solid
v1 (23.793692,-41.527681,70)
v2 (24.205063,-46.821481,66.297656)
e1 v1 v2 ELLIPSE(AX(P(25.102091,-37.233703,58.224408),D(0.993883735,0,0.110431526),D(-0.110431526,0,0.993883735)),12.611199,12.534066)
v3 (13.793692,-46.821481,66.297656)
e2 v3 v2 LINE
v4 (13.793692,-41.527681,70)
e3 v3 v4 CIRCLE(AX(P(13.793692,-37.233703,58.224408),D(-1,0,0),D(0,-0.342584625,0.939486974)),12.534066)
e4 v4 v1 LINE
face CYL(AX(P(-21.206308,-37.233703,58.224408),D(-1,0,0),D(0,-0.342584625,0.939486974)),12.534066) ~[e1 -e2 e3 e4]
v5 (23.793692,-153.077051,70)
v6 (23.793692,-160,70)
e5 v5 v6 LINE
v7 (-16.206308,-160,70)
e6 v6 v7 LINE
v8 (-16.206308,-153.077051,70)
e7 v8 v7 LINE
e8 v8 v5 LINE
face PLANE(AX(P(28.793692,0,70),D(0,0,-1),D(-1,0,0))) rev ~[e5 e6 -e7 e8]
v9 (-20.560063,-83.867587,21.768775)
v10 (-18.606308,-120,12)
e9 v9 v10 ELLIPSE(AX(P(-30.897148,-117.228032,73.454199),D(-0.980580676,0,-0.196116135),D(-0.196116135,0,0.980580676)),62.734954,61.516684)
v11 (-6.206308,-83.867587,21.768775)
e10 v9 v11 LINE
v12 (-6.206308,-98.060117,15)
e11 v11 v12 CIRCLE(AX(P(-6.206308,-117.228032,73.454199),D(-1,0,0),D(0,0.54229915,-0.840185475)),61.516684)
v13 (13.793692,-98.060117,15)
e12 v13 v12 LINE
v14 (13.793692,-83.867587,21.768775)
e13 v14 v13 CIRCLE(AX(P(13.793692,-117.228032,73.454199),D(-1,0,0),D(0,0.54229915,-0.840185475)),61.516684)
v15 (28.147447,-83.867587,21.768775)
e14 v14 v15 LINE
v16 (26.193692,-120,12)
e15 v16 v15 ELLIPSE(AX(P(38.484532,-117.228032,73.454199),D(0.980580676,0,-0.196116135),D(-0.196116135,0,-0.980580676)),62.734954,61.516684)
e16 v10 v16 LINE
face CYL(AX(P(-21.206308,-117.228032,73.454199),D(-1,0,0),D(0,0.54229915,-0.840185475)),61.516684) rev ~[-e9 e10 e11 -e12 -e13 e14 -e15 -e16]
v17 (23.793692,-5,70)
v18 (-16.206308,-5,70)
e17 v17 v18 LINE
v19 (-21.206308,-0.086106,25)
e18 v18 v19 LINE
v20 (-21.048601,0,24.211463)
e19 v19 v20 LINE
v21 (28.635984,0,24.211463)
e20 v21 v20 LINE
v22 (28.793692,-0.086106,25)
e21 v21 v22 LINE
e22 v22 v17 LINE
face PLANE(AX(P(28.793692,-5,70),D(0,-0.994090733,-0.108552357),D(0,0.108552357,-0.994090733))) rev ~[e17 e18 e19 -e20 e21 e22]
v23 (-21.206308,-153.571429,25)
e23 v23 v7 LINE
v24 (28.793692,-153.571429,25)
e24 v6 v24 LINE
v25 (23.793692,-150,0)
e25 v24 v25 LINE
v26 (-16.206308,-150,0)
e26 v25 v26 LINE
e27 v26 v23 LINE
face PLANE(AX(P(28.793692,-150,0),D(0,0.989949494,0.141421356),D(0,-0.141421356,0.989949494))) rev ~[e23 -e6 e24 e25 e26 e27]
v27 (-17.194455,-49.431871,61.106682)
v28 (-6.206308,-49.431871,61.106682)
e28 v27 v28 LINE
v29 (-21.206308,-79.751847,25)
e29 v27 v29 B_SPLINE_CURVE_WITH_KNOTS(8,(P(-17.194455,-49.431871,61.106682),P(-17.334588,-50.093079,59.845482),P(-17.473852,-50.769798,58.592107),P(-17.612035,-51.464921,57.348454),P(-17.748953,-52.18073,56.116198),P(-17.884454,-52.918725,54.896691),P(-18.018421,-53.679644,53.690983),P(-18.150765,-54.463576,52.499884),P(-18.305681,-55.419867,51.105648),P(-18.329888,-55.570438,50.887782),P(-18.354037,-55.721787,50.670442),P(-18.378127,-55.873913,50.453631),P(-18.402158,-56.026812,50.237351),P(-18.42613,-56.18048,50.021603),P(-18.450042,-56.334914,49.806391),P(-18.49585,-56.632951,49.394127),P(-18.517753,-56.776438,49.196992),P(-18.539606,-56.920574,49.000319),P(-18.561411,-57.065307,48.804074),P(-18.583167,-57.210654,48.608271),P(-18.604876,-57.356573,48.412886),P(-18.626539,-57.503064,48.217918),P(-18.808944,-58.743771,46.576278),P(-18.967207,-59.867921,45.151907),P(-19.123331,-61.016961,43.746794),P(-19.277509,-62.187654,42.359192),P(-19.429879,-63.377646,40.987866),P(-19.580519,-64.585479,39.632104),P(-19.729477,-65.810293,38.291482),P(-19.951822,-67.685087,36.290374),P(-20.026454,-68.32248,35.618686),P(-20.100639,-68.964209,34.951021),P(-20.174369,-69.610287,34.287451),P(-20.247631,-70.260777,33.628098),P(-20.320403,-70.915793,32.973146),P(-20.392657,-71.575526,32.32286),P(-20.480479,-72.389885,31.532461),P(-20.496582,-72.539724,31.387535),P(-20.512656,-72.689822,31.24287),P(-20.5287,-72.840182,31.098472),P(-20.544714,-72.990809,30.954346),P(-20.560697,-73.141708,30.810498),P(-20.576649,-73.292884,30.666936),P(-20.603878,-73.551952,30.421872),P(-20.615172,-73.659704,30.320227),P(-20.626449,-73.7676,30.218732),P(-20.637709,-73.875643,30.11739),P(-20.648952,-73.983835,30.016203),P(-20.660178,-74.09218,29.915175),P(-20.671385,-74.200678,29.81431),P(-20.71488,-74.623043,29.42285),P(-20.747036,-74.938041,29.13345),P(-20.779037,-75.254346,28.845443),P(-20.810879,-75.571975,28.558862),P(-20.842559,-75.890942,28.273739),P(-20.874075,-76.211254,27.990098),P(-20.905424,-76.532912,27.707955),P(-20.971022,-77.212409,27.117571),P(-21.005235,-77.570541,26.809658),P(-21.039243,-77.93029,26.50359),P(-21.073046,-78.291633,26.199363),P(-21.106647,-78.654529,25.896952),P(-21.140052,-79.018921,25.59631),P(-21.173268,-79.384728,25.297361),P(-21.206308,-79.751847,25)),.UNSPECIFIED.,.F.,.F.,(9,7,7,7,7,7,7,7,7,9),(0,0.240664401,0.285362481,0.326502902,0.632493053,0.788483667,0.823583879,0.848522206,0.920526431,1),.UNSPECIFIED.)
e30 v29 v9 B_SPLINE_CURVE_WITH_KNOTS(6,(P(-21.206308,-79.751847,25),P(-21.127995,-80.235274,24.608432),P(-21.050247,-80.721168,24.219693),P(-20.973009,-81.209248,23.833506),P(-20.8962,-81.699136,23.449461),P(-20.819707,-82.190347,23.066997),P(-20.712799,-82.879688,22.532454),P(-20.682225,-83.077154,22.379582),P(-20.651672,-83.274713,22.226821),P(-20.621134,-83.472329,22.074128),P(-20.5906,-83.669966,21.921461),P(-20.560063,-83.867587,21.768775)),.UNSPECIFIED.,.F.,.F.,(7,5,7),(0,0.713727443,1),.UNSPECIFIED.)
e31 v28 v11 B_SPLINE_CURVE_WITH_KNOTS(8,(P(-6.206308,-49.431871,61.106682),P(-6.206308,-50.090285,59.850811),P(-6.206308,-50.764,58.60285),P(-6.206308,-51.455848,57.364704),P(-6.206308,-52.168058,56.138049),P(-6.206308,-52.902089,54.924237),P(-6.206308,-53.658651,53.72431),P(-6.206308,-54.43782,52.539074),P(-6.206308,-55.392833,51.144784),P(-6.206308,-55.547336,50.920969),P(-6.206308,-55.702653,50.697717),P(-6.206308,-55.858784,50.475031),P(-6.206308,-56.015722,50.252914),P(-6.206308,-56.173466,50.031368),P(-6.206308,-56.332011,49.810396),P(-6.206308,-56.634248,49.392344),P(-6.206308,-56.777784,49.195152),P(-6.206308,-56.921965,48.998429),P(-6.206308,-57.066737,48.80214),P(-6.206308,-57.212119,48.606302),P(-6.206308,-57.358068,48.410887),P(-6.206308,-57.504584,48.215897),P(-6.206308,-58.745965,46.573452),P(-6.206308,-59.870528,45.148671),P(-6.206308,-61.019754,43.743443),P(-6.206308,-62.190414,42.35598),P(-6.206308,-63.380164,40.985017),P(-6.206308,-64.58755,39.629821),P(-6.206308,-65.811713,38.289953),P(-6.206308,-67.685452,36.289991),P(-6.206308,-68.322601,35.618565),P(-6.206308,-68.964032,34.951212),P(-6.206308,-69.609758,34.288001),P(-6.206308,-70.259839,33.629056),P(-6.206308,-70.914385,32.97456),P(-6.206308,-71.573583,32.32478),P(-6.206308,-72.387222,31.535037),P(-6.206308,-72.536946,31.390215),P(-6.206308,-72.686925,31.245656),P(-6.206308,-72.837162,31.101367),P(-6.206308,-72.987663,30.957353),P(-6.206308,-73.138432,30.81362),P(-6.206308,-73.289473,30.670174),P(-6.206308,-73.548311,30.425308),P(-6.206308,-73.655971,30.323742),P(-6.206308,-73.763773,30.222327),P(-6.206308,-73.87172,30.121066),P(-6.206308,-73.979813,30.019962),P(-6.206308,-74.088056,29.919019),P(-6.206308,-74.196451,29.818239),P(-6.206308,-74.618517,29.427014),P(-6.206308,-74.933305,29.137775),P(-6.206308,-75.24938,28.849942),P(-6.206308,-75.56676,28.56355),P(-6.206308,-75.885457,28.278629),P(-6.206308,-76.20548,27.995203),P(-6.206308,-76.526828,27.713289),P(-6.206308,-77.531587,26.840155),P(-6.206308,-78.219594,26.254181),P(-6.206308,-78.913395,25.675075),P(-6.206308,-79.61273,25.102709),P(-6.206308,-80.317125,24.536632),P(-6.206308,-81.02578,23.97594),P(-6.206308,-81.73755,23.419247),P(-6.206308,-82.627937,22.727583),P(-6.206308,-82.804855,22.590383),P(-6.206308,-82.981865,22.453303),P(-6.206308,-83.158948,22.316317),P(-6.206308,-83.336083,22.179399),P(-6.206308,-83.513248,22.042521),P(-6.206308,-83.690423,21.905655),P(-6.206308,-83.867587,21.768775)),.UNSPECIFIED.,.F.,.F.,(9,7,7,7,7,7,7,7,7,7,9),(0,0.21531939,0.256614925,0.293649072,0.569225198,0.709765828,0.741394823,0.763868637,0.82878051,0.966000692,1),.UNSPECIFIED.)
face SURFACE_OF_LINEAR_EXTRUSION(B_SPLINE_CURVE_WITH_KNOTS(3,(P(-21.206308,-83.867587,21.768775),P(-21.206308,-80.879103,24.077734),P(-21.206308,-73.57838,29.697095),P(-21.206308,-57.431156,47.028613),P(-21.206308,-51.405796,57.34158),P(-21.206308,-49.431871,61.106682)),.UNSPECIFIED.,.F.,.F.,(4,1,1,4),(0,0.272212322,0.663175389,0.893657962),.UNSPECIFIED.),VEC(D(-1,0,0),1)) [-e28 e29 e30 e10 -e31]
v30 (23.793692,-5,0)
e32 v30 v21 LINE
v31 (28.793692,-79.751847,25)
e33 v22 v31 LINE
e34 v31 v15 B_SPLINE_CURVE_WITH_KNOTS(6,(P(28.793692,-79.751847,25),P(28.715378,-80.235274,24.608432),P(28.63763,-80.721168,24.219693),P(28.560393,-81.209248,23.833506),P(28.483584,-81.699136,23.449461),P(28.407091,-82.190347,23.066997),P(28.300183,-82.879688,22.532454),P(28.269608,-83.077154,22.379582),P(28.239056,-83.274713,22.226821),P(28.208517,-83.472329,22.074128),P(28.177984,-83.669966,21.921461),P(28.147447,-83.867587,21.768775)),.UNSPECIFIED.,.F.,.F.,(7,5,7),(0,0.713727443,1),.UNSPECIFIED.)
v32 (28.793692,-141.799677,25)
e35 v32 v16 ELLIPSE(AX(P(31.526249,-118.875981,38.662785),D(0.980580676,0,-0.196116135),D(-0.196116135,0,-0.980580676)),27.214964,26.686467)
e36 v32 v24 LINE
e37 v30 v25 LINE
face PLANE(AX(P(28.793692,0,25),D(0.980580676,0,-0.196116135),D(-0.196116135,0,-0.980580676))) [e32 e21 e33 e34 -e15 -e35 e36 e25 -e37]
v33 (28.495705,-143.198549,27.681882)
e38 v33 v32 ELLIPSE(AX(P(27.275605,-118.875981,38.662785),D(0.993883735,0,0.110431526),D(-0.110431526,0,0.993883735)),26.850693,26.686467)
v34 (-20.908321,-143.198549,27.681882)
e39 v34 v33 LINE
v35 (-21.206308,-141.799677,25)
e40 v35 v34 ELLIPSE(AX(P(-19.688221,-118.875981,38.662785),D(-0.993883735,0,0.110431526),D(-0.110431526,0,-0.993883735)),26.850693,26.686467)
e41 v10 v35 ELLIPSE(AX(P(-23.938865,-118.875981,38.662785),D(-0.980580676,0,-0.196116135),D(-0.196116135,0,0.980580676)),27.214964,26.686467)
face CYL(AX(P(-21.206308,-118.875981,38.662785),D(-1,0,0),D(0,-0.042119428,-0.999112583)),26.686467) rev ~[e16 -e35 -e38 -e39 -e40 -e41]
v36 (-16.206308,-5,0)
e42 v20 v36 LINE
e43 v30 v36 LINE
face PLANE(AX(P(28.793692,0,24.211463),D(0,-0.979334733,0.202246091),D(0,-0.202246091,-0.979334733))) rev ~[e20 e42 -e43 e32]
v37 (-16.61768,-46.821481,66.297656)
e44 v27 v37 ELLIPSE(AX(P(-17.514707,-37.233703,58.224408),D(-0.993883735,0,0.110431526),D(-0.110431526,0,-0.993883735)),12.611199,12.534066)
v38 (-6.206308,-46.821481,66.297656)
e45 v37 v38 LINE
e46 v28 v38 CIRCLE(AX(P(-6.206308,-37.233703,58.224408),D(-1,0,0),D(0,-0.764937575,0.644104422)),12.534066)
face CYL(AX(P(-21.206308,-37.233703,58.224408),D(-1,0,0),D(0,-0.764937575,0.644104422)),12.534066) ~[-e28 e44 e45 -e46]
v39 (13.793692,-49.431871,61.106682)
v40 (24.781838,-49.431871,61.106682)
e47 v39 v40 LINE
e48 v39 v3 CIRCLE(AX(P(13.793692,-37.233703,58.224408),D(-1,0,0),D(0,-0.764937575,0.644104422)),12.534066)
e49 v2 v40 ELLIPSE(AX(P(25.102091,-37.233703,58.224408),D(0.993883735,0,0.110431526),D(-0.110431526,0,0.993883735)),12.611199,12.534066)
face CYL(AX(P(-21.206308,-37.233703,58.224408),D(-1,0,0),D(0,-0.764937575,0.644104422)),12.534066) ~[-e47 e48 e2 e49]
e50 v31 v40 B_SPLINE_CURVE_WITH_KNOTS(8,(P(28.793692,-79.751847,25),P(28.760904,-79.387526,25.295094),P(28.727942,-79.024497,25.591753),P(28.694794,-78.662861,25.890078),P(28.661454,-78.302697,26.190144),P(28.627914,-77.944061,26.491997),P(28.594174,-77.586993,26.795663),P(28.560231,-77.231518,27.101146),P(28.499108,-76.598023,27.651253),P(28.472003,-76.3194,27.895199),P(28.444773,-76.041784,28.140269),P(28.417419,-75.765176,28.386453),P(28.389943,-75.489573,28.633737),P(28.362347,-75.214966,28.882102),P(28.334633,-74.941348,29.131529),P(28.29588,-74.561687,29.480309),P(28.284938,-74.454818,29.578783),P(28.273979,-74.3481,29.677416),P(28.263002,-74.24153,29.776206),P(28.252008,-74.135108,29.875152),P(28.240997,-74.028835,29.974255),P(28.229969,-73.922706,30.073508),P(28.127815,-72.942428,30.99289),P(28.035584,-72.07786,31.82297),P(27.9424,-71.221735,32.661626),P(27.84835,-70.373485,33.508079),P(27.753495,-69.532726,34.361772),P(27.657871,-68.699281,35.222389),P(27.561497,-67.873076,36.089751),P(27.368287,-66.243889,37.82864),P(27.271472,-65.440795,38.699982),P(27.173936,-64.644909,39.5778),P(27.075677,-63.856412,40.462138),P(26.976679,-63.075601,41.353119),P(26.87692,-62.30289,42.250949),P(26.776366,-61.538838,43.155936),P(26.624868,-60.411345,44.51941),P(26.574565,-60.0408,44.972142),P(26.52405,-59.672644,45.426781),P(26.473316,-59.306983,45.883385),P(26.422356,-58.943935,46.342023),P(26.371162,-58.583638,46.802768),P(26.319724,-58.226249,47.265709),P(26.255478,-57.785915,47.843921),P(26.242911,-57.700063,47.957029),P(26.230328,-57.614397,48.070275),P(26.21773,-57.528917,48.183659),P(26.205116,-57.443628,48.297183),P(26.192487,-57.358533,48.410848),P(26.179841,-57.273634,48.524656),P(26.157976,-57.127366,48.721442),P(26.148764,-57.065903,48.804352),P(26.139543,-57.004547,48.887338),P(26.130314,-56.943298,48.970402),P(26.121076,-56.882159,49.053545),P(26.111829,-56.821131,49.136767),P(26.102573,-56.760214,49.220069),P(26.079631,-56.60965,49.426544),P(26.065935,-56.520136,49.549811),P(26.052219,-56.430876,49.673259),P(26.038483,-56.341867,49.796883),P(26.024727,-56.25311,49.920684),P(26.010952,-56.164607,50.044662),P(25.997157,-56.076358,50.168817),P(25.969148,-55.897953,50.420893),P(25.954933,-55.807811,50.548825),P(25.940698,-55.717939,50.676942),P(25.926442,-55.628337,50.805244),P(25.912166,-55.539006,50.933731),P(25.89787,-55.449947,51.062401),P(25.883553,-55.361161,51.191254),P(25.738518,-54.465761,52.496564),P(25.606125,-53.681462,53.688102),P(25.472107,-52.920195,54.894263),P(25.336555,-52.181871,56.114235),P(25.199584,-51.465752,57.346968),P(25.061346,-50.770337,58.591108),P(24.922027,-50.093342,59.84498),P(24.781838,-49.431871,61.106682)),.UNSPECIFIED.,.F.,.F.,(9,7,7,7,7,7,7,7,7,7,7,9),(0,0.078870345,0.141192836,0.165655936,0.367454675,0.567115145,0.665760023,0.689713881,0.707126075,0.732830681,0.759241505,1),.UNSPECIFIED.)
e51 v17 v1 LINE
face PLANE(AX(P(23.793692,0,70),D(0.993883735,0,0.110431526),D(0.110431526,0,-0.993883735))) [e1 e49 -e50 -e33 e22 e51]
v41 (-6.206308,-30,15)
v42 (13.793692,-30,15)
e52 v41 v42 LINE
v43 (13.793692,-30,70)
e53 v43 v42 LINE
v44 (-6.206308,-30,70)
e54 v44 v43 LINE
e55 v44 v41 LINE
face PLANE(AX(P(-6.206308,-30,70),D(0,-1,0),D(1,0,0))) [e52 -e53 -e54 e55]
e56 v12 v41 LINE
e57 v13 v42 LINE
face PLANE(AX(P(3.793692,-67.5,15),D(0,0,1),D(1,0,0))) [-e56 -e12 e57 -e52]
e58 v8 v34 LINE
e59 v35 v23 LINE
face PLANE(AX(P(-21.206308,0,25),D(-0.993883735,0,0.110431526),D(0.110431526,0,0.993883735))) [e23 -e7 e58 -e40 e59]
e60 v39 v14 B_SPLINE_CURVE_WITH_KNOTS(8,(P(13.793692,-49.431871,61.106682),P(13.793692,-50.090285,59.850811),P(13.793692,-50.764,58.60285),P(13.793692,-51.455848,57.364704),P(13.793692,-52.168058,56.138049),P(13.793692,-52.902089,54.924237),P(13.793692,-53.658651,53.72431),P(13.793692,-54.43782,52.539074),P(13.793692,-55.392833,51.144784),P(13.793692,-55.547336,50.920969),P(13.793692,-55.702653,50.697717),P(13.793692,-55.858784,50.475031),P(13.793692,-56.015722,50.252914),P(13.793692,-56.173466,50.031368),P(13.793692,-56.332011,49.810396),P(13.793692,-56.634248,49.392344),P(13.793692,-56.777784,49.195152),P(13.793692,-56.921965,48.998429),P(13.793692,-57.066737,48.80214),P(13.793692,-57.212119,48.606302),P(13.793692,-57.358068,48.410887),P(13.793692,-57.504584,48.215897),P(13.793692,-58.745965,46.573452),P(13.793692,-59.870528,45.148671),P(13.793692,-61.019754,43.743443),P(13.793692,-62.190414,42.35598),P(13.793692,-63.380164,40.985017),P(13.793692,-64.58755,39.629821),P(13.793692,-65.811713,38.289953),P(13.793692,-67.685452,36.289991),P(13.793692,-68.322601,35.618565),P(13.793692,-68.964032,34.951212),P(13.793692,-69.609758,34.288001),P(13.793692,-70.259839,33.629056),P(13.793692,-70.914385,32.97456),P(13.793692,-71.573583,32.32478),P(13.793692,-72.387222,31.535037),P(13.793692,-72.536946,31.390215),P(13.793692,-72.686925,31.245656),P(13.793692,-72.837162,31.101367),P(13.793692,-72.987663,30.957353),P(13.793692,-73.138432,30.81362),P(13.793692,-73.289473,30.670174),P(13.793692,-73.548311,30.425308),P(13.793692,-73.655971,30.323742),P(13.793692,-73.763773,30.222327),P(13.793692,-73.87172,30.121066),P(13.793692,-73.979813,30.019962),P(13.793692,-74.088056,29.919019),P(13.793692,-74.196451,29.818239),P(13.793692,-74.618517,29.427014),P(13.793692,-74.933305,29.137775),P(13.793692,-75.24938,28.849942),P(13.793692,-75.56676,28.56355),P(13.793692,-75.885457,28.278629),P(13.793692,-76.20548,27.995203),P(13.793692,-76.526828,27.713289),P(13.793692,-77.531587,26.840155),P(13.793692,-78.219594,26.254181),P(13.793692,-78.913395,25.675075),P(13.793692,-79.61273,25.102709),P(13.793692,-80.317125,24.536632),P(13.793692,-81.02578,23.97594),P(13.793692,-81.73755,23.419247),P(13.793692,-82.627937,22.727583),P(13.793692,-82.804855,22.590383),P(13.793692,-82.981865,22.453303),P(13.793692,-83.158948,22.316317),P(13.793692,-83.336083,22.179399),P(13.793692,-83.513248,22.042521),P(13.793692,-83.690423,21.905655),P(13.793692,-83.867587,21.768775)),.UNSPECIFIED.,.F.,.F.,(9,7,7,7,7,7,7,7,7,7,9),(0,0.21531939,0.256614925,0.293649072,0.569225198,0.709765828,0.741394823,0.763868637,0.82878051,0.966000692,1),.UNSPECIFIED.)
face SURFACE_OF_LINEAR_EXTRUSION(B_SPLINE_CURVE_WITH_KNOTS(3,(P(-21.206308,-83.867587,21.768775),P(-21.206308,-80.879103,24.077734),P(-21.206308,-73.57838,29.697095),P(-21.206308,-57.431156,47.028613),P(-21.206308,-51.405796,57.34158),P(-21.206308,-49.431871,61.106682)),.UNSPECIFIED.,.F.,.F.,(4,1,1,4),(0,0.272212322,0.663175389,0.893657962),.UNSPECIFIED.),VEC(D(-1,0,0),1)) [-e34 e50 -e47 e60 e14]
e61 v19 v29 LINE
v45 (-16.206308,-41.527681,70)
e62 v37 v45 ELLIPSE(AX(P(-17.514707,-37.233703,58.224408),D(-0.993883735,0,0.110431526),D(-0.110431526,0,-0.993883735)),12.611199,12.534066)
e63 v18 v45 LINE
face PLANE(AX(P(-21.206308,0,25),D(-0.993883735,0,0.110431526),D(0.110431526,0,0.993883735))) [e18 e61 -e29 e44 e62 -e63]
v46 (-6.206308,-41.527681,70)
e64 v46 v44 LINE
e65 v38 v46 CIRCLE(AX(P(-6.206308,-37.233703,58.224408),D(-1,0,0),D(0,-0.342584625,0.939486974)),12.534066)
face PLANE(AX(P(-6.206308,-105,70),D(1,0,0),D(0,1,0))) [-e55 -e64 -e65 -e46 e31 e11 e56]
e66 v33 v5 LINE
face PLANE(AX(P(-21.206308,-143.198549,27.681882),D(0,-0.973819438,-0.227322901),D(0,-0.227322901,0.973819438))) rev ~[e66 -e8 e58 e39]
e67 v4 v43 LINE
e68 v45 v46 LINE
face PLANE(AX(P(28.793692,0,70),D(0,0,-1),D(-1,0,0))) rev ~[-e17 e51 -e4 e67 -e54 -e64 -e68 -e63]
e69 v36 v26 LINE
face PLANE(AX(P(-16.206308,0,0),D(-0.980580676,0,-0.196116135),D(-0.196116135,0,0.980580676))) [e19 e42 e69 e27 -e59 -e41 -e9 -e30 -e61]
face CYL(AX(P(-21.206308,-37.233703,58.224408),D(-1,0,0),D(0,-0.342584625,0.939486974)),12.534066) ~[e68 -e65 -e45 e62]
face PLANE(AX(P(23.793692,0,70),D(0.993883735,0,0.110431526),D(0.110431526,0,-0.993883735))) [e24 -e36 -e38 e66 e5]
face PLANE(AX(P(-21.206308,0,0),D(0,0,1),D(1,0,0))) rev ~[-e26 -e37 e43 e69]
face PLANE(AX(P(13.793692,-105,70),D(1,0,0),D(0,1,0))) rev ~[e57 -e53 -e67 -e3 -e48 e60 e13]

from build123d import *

# Parameters (mm, degrees)
F1_DEPTH = 160
F3_W     = 20
F3_H     = 75
F4_DEPTH = 55
F6_DEPTH = 80
F7_DEPTH = 80
F8_DEPTH = 200


with BuildPart() as f1:
    # F0 (on Front) → F1 (new body)
    with BuildSketch(Plane.XZ):
        Polygon((-21.2063081563, 25), (-16.2063081563, 70), (-21.2063081563, 70), align=None)
        Polygon((23.7936918437, 70), (-16.2063081563, 70), (-21.2063081563, 25), (-16.2063081563, 0), (23.7936918437, 0), (28.7936918437, 25), align=None)
        Polygon((28.7936918437, 70), (23.7936918437, 70), (28.7936918437, 25), align=None)
        Polygon((28.7936918437, 0), (28.7936918437, 25), (23.7936918437, 0), align=None)
        Polygon((-16.2063081563, 0), (-21.2063081563, 25), (-21.2063081563, 0), align=None)
    extrude(amount=F1_DEPTH)

    # F3 (on face) → F4 (cut)
    with BuildSketch(Plane.XY.offset(70)):
        with Locations((3.7936918437, -67.5)):
            Rectangle(F3_W, F3_H)
    extrude(amount=-F4_DEPTH, mode=Mode.SUBTRACT)

    # F5 (on face) → F6 (cut)
    with BuildSketch(Plane(origin=(-21.2063081563, 0, 0), x_dir=(0, -1, 0), z_dir=(-1, 0, 0))):
        with BuildLine():
            Line((120, 37), (120, 12))
            ThreePointArc((120, 12), (133.8212996215, 16.5538504991), (143.1985488392, 27.6818815335))
            Line((143.1985488392, 27.6818815335), (145.3737177065, 37))
            Line((145.3737177065, 37), (120, 37))
        make_face()
        with BuildLine():
            ThreePointArc((83.8675871491, 21.7687748373), (101.1727846043, 14.0695932653), (120, 12))
            Line((120, 12), (120, 37))
            Line((120, 37), (145.3737177065, 37))
            Line((145.3737177065, 37), (153.0770510435, 70))
            Line((153.0770510435, 70), (41.5276810527, 70))
            ThreePointArc((41.5276810527, 70), (44.4171997001, 68.4957364145), (46.8214808068, 66.2976555906))
            ThreePointArc((46.8214808068, 66.2976555906), (48.4316228068, 63.8555180083), (49.431870901, 61.1066824401))
            add(Edge.make_bspline(
                [(83.8675871491, 21.7687748373), (80.8791033045, 24.0777342993), (73.578379889, 29.6970945717), (57.4311562796, 47.0286131058), (51.4057960432, 57.3415797194), (49.431870901, 61.1066824401)],
                knots=[0, 0, 0, 0, 0.2722123221, 0.663175389, 0.8936579619, 0.8936579619, 0.8936579619, 0.8936579619], degree=3))
        make_face()
    extrude(amount=-F6_DEPTH, mode=Mode.SUBTRACT)

    # F2 (on face) → F7 (cut)
    with BuildSketch(Plane.YZ.offset(28.7936918437)):
        Polygon((-160, 0), (-150, 0), (-160, 70), (-160, 24.2114625871), align=None)
        Polygon((-5, 70), (0, 24.2114625871), (0, 70), align=None)
        Polygon((-5, 0), (0, 0), (0, 24.2114625871), align=None)
    extrude(amount=-F7_DEPTH, mode=Mode.SUBTRACT)

    # F0 (on Front) → F8 (cut)
    with BuildSketch(Plane.XZ):
        Polygon((28.7936918437, 70), (23.7936918437, 70), (28.7936918437, 25), align=None)
        Polygon((-21.2063081563, 25), (-16.2063081563, 70), (-21.2063081563, 70), align=None)
        Polygon((28.7936918437, 0), (28.7936918437, 25), (23.7936918437, 0), align=None)
        Polygon((-16.2063081563, 0), (-21.2063081563, 25), (-21.2063081563, 0), align=None)
    extrude(amount=F8_DEPTH, mode=Mode.SUBTRACT)


solid = f1.part
